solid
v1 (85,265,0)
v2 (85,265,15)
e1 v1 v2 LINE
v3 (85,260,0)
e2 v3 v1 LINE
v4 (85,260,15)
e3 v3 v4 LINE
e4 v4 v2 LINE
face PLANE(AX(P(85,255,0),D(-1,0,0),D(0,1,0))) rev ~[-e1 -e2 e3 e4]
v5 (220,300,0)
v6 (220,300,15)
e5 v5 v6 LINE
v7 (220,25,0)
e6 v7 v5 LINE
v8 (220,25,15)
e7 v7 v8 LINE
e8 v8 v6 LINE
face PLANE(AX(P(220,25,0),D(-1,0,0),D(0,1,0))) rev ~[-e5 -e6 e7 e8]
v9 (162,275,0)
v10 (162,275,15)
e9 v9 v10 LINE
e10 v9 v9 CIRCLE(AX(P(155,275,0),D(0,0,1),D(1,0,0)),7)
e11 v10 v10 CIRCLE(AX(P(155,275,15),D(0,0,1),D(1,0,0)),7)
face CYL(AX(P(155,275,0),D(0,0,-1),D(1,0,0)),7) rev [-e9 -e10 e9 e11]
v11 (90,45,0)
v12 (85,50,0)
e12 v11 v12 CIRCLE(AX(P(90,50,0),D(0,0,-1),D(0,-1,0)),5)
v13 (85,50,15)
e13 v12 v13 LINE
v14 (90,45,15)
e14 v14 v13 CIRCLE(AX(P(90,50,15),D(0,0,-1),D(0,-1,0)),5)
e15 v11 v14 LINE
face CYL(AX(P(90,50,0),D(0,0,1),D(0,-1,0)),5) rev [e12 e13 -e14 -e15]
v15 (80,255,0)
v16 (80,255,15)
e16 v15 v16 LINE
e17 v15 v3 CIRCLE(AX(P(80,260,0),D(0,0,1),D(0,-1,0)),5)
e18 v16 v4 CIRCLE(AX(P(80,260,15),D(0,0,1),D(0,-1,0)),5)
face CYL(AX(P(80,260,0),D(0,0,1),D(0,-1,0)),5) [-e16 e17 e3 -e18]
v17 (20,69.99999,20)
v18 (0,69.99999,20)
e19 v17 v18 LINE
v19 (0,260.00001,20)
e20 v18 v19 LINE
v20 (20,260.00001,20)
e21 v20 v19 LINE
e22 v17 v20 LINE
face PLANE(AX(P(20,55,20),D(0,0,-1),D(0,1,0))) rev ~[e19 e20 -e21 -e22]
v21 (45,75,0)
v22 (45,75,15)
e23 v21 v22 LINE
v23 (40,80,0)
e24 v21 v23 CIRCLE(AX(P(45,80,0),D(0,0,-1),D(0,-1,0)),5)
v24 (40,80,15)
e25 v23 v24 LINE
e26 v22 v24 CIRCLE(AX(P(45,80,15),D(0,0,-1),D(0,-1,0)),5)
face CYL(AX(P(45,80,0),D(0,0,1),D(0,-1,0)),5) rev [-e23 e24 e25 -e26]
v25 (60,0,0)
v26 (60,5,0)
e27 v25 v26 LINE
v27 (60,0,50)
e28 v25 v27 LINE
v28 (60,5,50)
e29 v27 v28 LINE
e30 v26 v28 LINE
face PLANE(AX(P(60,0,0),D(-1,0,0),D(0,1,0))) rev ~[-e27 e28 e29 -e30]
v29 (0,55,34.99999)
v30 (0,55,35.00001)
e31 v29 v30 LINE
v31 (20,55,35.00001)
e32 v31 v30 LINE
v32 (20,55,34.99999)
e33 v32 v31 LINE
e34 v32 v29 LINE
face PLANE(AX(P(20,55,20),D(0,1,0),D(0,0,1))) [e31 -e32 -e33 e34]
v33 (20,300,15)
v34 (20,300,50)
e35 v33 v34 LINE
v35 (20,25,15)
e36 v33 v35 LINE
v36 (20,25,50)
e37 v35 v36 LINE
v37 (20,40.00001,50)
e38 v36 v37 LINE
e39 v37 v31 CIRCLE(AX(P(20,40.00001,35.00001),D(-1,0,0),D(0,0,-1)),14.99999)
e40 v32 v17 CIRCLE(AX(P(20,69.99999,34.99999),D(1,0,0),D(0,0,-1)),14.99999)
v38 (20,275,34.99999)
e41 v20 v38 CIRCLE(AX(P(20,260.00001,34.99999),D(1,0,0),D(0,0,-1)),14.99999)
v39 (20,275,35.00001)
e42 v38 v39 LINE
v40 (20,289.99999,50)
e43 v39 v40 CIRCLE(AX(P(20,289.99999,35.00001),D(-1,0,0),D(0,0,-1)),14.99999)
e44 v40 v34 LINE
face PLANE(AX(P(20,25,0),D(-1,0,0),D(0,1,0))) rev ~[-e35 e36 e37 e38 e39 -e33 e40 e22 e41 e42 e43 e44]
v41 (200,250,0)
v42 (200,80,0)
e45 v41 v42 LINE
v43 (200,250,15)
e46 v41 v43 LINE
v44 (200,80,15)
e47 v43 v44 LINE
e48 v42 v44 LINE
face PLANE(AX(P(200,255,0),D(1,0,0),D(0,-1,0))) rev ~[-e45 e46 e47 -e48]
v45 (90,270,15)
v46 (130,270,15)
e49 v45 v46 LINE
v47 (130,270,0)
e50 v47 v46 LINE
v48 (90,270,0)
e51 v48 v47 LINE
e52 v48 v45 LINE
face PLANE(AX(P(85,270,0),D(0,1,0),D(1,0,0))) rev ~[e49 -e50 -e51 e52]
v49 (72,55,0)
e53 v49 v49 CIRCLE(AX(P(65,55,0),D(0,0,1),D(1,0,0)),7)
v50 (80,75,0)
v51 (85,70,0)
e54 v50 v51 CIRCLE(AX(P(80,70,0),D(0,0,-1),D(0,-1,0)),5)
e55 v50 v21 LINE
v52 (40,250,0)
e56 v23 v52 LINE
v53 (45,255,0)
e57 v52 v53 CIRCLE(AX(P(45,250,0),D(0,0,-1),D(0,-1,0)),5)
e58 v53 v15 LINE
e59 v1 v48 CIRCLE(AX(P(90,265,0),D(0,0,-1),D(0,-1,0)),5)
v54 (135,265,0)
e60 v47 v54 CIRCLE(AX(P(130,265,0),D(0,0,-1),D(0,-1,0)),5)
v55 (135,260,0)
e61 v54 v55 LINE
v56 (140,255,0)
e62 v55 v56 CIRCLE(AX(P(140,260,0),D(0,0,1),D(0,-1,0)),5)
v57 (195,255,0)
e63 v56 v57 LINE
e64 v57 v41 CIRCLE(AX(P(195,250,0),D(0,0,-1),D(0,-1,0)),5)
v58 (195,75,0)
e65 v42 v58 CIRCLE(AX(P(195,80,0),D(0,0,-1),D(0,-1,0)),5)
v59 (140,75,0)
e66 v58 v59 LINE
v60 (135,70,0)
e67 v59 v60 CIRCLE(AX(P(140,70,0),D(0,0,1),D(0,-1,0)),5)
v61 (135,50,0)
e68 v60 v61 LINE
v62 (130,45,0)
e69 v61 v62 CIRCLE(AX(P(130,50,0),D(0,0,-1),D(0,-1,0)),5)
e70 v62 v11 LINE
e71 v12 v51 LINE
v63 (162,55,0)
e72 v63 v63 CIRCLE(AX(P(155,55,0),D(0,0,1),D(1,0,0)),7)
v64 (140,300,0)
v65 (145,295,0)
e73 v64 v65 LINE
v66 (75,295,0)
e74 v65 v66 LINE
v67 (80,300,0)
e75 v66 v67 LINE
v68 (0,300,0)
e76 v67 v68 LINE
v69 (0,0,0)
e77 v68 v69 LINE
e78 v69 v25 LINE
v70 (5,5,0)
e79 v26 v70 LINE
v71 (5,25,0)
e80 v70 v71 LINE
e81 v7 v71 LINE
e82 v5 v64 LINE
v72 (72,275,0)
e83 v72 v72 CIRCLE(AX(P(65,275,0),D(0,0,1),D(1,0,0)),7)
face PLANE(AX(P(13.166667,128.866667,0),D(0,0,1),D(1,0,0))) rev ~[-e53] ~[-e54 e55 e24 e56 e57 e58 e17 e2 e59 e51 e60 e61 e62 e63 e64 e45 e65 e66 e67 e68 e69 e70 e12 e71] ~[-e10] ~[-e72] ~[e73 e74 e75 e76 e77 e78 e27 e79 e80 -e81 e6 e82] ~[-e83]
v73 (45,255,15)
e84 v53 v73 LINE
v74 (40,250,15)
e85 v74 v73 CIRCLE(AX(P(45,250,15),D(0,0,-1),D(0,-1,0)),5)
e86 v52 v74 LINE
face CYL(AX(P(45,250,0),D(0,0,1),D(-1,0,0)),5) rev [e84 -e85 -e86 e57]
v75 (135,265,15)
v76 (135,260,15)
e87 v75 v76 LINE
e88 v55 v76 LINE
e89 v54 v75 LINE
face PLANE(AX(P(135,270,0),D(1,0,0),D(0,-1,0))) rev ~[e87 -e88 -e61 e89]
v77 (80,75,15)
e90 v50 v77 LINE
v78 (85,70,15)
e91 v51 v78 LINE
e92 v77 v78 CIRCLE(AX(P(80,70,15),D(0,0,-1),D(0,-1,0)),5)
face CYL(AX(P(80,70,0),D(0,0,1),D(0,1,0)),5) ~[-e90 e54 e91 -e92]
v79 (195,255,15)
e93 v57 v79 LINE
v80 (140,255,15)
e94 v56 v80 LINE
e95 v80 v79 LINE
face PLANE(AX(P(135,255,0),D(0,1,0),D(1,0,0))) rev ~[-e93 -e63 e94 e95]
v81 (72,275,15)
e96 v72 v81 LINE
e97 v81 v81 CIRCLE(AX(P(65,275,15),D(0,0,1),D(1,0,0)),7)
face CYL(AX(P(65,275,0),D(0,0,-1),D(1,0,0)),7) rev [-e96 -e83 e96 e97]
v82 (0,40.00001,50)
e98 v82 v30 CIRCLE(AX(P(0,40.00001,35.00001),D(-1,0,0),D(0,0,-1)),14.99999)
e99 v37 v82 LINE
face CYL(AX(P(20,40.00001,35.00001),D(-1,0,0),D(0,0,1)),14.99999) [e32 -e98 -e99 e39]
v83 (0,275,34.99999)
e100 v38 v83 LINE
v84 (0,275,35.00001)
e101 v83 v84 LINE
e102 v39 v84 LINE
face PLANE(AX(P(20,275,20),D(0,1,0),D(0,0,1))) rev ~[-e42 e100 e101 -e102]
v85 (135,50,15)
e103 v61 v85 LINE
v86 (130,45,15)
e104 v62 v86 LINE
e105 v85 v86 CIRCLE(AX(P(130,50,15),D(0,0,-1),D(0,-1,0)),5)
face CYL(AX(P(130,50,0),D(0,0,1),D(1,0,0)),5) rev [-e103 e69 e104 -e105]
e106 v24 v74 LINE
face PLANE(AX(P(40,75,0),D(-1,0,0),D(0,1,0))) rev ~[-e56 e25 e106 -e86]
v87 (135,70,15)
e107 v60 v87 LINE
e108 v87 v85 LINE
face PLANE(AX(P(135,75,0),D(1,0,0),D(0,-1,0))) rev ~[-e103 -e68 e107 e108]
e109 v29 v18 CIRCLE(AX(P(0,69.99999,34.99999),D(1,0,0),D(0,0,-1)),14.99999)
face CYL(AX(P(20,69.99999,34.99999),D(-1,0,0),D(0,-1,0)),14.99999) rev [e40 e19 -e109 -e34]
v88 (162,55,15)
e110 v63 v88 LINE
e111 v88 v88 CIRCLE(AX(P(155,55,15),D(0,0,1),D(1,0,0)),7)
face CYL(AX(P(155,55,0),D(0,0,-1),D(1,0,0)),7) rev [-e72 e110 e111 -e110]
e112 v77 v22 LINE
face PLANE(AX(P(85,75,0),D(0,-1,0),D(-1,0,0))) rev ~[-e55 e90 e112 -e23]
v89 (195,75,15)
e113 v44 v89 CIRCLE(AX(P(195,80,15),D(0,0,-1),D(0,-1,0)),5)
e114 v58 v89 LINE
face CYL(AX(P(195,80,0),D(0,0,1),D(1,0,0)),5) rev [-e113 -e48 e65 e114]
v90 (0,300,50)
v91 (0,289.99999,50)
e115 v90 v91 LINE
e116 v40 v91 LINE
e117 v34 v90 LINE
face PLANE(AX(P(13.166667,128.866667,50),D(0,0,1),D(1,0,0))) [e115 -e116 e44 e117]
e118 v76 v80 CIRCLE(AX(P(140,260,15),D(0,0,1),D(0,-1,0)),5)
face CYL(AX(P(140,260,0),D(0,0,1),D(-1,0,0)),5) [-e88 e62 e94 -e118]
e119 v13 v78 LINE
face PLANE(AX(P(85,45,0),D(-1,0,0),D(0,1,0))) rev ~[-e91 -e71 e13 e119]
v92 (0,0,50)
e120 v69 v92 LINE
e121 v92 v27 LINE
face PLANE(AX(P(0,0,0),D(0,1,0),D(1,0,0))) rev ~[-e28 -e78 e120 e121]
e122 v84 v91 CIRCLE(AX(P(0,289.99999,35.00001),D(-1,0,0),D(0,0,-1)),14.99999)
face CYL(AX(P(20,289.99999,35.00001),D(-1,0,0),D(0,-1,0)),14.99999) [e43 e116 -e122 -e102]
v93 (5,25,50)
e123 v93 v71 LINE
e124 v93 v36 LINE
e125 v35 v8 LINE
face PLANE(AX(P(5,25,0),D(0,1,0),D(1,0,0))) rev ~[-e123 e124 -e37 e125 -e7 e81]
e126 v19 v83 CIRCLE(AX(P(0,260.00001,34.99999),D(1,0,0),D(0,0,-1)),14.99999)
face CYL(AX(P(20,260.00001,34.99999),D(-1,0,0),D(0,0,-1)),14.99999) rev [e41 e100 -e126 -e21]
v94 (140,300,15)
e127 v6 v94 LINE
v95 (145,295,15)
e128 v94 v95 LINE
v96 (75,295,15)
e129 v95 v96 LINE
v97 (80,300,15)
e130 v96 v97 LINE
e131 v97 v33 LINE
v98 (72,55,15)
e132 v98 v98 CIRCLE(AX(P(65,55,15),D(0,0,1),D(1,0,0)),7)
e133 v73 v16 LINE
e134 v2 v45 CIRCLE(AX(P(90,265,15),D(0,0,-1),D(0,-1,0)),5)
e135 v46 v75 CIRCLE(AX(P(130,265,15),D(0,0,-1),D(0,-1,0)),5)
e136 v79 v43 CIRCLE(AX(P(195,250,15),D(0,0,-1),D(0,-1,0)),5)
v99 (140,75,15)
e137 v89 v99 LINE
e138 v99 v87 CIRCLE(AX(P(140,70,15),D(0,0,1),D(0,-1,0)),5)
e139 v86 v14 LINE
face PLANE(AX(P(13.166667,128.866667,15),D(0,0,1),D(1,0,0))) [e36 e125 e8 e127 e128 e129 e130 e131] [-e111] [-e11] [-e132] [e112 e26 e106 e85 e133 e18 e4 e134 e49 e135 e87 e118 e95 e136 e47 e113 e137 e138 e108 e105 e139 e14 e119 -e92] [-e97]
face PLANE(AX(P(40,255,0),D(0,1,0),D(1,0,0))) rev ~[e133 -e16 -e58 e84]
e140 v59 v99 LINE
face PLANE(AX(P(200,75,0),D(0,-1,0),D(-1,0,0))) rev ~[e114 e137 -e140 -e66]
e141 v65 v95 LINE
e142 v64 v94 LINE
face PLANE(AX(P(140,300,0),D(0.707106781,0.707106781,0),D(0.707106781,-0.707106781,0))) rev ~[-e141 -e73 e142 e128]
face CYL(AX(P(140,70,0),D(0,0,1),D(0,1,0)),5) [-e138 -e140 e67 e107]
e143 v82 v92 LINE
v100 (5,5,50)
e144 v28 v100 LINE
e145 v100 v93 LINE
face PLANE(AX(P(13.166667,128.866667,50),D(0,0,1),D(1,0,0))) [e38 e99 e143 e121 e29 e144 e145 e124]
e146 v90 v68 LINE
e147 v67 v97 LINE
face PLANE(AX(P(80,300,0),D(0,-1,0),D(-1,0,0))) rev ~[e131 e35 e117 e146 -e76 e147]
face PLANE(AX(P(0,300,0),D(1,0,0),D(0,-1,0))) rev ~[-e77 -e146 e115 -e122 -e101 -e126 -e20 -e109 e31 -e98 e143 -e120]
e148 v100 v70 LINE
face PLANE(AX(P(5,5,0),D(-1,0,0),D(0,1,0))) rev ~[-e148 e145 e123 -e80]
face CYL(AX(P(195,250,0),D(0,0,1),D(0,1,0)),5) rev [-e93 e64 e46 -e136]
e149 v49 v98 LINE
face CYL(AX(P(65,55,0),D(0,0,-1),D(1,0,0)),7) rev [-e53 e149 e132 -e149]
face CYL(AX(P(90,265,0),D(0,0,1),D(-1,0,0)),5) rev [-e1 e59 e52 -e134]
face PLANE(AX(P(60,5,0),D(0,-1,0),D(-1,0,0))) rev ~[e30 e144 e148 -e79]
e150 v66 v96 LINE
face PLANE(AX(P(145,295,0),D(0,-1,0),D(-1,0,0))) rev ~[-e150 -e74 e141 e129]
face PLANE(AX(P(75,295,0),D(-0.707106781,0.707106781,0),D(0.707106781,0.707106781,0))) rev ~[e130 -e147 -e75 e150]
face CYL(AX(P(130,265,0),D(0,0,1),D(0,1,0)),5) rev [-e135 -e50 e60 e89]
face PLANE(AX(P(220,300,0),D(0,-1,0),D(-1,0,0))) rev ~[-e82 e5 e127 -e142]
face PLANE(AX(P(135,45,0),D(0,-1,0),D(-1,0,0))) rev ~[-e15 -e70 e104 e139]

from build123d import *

# Parameters (mm, degrees)
F0_R     = 7
F1_DEPTH = 15
F2_DEPTH = 50
F3_W     = 220
F3_H     = 30
F4_DEPTH = 25
F5_R     = 14.99999
F6_R     = 5


# Not quite as in the source:
# - a fillet or chamfer is up to 0.001 mm smaller than in the source, because OpenCascade refuses the exact size


with BuildPart() as f1:
    # F0 (on Top) → F1 (new body)
    with BuildSketch(Plane.XY):
        Polygon((0, 300), (0, 0), (60, 0), (60, 5), (5, 5), (5, 25), (20, 25), (20, 300), align=None)
        Polygon((80, 300), (20, 300), (20, 25), (220, 25), (220, 300), (140, 300), (145, 295), (75, 295), align=None)
        with Locations((65, 55)):
            Circle(F0_R, mode=Mode.SUBTRACT)
        with Locations((155, 55)):
            Circle(F0_R, mode=Mode.SUBTRACT)
        Polygon((40, 75), (40, 255), (85, 255), (85, 270), (135, 270), (135, 255), (200, 255), (200, 75), (135, 75), (135, 45), (85, 45), (85, 75), align=None, mode=Mode.SUBTRACT)
        with Locations((65, 275)):
            Circle(F0_R, mode=Mode.SUBTRACT)
        with Locations((155, 275)):
            Circle(F0_R, mode=Mode.SUBTRACT)
    extrude(amount=F1_DEPTH)

    # F0 (on Top) → F2 (join)
    with BuildSketch(Plane.XY):
        Polygon((0, 300), (0, 0), (60, 0), (60, 5), (5, 5), (5, 25), (20, 25), (20, 300), align=None)
    extrude(amount=F2_DEPTH)

    # F3 (on face) → F4 (cut)
    with BuildSketch(Plane.YZ.offset(20)):
        with Locations((165, 35)):
            Rectangle(F3_W, F3_H)
    extrude(amount=-F4_DEPTH, mode=Mode.SUBTRACT)

    # F5 (radius 15 in the source; OpenCascade refuses exactly that, so slightly less here)
    f5_edges = [f1.edges().sort_by_distance(p)[0] for p in [
        (10, 275, 20),
        (10, 55, 20),
        (10, 275, 50),
        (10, 55, 50),
    ]]
    fillet(f5_edges, radius=F5_R)

    # F6
    f6_edges = [f1.edges().sort_by_distance(p)[0] for p in [
        (85, 75, 7.5),
        (135, 75, 7.5),
        (85, 45, 7.5),
        (135, 45, 7.5),
        (85, 255, 7.5),
        (85, 270, 7.5),
        (135, 255, 7.5),
        (135, 270, 7.5),
        (40, 75, 7.5),
        (40, 255, 7.5),
        (200, 255, 7.5),
        (200, 75, 7.5),
    ]]
    fillet(f6_edges, radius=F6_R)


solid = f1.part
